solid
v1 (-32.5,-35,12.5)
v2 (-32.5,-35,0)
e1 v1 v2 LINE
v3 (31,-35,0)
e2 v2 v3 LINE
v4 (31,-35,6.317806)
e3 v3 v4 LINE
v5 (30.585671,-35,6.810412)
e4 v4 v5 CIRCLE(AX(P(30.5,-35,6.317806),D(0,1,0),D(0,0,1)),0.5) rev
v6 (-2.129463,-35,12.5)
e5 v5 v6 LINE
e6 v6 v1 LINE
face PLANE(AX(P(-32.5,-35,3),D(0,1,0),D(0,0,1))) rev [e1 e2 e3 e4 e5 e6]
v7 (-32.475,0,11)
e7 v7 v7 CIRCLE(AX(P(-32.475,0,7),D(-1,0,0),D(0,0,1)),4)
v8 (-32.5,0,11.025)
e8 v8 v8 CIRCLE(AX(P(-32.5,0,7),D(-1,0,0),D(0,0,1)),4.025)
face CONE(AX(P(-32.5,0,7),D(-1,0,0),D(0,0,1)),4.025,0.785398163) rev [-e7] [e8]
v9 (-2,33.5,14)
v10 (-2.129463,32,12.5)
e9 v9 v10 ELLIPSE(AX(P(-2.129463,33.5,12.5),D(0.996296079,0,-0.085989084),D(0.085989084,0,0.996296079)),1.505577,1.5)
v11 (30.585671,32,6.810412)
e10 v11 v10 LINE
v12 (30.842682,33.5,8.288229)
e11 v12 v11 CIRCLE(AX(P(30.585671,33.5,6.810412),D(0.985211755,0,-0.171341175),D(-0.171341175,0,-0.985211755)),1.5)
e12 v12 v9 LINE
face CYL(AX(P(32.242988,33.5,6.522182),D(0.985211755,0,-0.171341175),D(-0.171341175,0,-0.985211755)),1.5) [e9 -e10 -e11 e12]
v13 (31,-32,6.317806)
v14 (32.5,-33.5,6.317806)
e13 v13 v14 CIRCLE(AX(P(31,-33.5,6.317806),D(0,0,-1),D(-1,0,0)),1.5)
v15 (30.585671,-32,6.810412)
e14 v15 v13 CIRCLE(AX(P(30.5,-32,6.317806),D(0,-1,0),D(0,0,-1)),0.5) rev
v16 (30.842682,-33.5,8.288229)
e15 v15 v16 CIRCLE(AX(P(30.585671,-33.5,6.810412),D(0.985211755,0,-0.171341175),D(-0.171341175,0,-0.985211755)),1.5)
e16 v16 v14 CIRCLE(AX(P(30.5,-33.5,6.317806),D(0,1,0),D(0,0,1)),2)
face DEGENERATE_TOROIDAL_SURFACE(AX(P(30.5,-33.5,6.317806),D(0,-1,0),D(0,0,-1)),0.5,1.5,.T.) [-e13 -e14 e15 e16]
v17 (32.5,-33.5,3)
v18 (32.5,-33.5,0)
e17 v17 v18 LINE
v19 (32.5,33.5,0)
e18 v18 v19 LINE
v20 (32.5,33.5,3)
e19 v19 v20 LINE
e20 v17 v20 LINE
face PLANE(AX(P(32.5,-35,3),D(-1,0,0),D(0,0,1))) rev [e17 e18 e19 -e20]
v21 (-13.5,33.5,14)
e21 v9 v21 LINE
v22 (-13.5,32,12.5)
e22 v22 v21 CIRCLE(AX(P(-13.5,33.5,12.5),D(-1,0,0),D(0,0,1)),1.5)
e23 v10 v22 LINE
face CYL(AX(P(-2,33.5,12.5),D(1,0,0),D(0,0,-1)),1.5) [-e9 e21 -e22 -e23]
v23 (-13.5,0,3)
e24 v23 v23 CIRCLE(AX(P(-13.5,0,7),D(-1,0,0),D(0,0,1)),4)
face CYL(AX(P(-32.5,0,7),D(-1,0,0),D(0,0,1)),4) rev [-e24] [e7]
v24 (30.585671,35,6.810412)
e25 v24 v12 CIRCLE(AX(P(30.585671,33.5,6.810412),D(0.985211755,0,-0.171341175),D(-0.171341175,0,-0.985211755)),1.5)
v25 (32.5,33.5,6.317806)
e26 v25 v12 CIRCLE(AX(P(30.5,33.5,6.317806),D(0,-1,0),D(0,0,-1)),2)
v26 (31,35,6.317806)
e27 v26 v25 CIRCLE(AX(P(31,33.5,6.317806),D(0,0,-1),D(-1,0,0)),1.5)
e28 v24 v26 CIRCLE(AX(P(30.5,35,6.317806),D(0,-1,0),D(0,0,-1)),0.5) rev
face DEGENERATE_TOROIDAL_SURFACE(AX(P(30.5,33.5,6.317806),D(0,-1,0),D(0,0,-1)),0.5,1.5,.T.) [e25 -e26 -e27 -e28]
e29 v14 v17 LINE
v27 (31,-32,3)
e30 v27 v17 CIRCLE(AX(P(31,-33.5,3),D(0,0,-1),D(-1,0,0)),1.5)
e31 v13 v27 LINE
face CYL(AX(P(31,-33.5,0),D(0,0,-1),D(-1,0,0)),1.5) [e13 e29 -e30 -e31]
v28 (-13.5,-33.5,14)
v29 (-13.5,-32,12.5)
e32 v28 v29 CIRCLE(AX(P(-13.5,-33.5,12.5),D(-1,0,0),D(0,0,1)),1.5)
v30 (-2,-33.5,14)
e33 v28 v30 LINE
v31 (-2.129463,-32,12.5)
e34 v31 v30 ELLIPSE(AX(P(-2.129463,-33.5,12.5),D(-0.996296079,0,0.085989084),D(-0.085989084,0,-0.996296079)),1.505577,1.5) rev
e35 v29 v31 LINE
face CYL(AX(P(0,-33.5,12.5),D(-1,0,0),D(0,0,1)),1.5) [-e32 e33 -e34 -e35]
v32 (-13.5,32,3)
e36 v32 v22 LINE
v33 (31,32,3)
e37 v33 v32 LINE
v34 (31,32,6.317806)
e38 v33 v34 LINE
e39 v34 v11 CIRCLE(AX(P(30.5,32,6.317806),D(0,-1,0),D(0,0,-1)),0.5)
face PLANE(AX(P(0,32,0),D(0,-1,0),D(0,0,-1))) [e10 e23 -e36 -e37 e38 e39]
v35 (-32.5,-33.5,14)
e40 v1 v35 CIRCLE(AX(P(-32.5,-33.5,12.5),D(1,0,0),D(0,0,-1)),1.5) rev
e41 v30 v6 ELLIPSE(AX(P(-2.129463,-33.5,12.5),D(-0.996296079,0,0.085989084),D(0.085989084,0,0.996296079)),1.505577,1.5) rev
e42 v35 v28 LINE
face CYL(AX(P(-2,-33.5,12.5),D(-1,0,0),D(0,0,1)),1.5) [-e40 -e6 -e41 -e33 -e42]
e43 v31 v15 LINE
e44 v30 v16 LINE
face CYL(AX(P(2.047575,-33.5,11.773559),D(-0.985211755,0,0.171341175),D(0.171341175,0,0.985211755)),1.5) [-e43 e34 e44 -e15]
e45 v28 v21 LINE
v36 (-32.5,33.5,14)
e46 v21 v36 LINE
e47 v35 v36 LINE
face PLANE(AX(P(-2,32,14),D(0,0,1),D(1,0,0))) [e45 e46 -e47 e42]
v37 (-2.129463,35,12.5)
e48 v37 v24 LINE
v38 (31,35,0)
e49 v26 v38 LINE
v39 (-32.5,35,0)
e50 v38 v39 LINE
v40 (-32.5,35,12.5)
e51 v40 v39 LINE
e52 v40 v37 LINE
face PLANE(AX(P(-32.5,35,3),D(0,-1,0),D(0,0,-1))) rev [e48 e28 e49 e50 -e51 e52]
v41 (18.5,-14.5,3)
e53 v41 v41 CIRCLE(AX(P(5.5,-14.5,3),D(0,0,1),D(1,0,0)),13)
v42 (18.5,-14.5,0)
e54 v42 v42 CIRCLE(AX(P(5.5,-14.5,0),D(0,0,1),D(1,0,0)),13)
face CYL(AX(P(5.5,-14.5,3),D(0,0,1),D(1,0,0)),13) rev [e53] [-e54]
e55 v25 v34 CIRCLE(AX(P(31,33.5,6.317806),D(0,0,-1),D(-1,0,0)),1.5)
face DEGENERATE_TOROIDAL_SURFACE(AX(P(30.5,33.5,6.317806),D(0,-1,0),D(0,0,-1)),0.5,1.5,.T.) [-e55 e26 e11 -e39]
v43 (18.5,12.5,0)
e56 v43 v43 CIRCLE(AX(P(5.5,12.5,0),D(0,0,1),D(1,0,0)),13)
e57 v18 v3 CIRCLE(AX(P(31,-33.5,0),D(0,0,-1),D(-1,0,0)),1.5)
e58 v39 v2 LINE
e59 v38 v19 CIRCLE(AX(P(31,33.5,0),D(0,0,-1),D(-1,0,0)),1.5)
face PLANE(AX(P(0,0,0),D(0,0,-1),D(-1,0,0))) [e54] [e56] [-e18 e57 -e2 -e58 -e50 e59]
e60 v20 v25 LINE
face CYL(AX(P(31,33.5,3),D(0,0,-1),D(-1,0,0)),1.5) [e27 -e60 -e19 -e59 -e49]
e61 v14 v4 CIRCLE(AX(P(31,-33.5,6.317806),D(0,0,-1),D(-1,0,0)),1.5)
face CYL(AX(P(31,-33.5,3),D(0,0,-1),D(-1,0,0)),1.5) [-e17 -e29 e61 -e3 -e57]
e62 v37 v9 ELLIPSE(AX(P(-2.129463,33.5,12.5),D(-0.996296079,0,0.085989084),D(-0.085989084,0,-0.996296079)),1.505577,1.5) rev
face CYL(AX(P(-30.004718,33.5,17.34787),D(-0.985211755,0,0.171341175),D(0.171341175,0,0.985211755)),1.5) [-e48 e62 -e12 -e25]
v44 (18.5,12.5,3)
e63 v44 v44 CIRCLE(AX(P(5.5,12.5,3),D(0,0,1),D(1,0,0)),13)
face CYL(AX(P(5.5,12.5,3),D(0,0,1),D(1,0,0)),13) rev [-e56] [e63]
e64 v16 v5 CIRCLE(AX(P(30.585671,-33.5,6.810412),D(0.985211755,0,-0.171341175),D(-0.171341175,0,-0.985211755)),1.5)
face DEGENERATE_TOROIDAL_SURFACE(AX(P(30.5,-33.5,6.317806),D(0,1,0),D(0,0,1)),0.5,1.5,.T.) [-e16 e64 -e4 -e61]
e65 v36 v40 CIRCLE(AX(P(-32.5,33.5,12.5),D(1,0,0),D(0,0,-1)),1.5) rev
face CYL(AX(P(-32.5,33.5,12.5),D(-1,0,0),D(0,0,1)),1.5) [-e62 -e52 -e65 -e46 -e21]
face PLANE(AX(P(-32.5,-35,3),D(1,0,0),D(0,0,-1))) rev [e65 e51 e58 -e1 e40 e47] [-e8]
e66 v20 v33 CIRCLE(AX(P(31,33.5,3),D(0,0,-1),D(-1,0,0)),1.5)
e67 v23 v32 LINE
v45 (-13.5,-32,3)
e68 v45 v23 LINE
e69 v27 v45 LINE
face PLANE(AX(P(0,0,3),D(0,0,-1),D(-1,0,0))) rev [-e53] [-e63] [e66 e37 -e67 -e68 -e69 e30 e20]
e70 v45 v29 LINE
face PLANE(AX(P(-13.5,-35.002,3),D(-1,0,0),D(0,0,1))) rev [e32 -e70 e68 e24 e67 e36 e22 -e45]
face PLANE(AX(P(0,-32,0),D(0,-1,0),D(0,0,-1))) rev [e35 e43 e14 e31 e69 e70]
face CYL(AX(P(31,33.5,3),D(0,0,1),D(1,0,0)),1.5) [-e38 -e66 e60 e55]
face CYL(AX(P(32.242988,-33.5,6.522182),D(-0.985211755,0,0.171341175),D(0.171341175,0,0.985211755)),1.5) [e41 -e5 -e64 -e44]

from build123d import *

# Parameters (mm, degrees)
SKETCH1_W                       = 65
SKETCH1_H                       = 70
BOSS_EXTRUDE1_DEPTH             = 3
BOSS_EXTRUDE2_DEPTH             = 3
LPATTERN1_COUNT                 = 2
LPATTERN1_PITCH                 = 67
BOSS_EXTRUDE3_REACH             = 77.771
SKETCH4_W                       = 19
SKETCH4_H                       = 11
FILLET4_R                       = 2
FILLET3_R                       = 1.5
F_8_0MM_DOWEL_HOLE1_D           = 8
F_8_0MM_DOWEL_HOLE1_CSINK_D     = 8.05
F_8_0MM_DOWEL_HOLE1_CSINK_ANGLE = 90
F_1_0_26_DIAMETER_HOLE1_D       = 26
LPATTERN2_COUNT                 = 2
LPATTERN2_PITCH                 = 27


with BuildPart() as part:
    # Sketch1 → Boss-Extrude1 (new body)
    with BuildSketch(Plane.XY):
        Rectangle(SKETCH1_W, SKETCH1_H)
    extrude(amount=BOSS_EXTRUDE1_DEPTH)

    # Sketch2 → Boss-Extrude2 (add)
    with BuildSketch(Plane(origin=(-2.5, 35, 0), x_dir=(0, 0, -1), z_dir=(0, 1, 0))):
        Polygon((-14, -0.5), (-14, 30), (-3, 30), (-3, -35), (-8, -35), align=None)
    boss_extrude2 = extrude(amount=-BOSS_EXTRUDE2_DEPTH)

    # LPattern1: Boss-Extrude2 ×2
    with Locations(*[(0, -i * LPATTERN1_PITCH, 0) for i in range(1, LPATTERN1_COUNT)]):
        add(boss_extrude2)

    # Sketch4 → Boss-Extrude3 (add, up to next)
    with BuildSketch(Plane.XZ.offset(-32), mode=Mode.PRIVATE) as boss_extrude3_sk1:
        with Locations((-23, 8.5)):
            Rectangle(SKETCH4_W, SKETCH4_H)
    boss_extrude3_tool1 = extrude(boss_extrude3_sk1.sketch, amount=BOSS_EXTRUDE3_REACH, mode=Mode.PRIVATE) - part.part
    add(boss_extrude3_tool1.solids().sort_by_distance((-23, 32, 8.5))[0])

    # Fillet4
    fillet4_edges = [part.edges().sort_by_distance(p)[0] for p in [
        (32.5, 33.5, 8),
        (32.5, -33.5, 8),
    ]]
    fillet(fillet4_edges, radius=FILLET4_R)

    # Fillet3
    fillet3_edges = [part.edges().sort_by_distance(p)[0] for p in [
        (14.421341175, 32, 11.144114578),
        (14.421341175, 35, 11.144114578),
        (-17.25, 35, 14),
        (-7.75, 32, 14),
        (14.421341175, -32, 11.144114578),
        (-7.75, -32, 14),
        (-17.25, -35, 14),
        (14.421341175, -35, 11.144114578),
        (32.5, 32, 4.658902823),
        (32.030582356, 32, 7.605174145),
        (32.5, 35, 3.158902823),
        (32.030582356, 35, 7.605174145),
        (32.5, -32, 4.658902823),
        (32.030582356, -32, 7.605174145),
        (32.5, -35, 3.158902823),
        (32.030582356, -35, 7.605174145),
    ]]
    fillet(fillet3_edges, radius=FILLET3_R - 0.0001)  # a hair under: the kernel refuses the full size

    # Ø8.0mm Dowel Hole1 (through all)
    with Locations(Plane.ZY.offset(32.5)):
        with Locations((7, 0)):
            CounterSinkHole(F_8_0MM_DOWEL_HOLE1_D / 2, F_8_0MM_DOWEL_HOLE1_CSINK_D / 2, counter_sink_angle=F_8_0MM_DOWEL_HOLE1_CSINK_ANGLE)

    # Ø1.0 (26) Diameter Hole1 (through all)
    with Locations(Plane.XY.offset(3)):
        with Locations((5.5, -14.5)):
            f_1_0_26_diameter_hole1 = Hole(F_1_0_26_DIAMETER_HOLE1_D / 2)

    # LPattern2: Ø1.0 (26) Diameter Hole1 ×2
    with Locations(*[(0, i * LPATTERN2_PITCH, 0) for i in range(1, LPATTERN2_COUNT)]):
        add(f_1_0_26_diameter_hole1, mode=Mode.SUBTRACT)


solid = part.part
